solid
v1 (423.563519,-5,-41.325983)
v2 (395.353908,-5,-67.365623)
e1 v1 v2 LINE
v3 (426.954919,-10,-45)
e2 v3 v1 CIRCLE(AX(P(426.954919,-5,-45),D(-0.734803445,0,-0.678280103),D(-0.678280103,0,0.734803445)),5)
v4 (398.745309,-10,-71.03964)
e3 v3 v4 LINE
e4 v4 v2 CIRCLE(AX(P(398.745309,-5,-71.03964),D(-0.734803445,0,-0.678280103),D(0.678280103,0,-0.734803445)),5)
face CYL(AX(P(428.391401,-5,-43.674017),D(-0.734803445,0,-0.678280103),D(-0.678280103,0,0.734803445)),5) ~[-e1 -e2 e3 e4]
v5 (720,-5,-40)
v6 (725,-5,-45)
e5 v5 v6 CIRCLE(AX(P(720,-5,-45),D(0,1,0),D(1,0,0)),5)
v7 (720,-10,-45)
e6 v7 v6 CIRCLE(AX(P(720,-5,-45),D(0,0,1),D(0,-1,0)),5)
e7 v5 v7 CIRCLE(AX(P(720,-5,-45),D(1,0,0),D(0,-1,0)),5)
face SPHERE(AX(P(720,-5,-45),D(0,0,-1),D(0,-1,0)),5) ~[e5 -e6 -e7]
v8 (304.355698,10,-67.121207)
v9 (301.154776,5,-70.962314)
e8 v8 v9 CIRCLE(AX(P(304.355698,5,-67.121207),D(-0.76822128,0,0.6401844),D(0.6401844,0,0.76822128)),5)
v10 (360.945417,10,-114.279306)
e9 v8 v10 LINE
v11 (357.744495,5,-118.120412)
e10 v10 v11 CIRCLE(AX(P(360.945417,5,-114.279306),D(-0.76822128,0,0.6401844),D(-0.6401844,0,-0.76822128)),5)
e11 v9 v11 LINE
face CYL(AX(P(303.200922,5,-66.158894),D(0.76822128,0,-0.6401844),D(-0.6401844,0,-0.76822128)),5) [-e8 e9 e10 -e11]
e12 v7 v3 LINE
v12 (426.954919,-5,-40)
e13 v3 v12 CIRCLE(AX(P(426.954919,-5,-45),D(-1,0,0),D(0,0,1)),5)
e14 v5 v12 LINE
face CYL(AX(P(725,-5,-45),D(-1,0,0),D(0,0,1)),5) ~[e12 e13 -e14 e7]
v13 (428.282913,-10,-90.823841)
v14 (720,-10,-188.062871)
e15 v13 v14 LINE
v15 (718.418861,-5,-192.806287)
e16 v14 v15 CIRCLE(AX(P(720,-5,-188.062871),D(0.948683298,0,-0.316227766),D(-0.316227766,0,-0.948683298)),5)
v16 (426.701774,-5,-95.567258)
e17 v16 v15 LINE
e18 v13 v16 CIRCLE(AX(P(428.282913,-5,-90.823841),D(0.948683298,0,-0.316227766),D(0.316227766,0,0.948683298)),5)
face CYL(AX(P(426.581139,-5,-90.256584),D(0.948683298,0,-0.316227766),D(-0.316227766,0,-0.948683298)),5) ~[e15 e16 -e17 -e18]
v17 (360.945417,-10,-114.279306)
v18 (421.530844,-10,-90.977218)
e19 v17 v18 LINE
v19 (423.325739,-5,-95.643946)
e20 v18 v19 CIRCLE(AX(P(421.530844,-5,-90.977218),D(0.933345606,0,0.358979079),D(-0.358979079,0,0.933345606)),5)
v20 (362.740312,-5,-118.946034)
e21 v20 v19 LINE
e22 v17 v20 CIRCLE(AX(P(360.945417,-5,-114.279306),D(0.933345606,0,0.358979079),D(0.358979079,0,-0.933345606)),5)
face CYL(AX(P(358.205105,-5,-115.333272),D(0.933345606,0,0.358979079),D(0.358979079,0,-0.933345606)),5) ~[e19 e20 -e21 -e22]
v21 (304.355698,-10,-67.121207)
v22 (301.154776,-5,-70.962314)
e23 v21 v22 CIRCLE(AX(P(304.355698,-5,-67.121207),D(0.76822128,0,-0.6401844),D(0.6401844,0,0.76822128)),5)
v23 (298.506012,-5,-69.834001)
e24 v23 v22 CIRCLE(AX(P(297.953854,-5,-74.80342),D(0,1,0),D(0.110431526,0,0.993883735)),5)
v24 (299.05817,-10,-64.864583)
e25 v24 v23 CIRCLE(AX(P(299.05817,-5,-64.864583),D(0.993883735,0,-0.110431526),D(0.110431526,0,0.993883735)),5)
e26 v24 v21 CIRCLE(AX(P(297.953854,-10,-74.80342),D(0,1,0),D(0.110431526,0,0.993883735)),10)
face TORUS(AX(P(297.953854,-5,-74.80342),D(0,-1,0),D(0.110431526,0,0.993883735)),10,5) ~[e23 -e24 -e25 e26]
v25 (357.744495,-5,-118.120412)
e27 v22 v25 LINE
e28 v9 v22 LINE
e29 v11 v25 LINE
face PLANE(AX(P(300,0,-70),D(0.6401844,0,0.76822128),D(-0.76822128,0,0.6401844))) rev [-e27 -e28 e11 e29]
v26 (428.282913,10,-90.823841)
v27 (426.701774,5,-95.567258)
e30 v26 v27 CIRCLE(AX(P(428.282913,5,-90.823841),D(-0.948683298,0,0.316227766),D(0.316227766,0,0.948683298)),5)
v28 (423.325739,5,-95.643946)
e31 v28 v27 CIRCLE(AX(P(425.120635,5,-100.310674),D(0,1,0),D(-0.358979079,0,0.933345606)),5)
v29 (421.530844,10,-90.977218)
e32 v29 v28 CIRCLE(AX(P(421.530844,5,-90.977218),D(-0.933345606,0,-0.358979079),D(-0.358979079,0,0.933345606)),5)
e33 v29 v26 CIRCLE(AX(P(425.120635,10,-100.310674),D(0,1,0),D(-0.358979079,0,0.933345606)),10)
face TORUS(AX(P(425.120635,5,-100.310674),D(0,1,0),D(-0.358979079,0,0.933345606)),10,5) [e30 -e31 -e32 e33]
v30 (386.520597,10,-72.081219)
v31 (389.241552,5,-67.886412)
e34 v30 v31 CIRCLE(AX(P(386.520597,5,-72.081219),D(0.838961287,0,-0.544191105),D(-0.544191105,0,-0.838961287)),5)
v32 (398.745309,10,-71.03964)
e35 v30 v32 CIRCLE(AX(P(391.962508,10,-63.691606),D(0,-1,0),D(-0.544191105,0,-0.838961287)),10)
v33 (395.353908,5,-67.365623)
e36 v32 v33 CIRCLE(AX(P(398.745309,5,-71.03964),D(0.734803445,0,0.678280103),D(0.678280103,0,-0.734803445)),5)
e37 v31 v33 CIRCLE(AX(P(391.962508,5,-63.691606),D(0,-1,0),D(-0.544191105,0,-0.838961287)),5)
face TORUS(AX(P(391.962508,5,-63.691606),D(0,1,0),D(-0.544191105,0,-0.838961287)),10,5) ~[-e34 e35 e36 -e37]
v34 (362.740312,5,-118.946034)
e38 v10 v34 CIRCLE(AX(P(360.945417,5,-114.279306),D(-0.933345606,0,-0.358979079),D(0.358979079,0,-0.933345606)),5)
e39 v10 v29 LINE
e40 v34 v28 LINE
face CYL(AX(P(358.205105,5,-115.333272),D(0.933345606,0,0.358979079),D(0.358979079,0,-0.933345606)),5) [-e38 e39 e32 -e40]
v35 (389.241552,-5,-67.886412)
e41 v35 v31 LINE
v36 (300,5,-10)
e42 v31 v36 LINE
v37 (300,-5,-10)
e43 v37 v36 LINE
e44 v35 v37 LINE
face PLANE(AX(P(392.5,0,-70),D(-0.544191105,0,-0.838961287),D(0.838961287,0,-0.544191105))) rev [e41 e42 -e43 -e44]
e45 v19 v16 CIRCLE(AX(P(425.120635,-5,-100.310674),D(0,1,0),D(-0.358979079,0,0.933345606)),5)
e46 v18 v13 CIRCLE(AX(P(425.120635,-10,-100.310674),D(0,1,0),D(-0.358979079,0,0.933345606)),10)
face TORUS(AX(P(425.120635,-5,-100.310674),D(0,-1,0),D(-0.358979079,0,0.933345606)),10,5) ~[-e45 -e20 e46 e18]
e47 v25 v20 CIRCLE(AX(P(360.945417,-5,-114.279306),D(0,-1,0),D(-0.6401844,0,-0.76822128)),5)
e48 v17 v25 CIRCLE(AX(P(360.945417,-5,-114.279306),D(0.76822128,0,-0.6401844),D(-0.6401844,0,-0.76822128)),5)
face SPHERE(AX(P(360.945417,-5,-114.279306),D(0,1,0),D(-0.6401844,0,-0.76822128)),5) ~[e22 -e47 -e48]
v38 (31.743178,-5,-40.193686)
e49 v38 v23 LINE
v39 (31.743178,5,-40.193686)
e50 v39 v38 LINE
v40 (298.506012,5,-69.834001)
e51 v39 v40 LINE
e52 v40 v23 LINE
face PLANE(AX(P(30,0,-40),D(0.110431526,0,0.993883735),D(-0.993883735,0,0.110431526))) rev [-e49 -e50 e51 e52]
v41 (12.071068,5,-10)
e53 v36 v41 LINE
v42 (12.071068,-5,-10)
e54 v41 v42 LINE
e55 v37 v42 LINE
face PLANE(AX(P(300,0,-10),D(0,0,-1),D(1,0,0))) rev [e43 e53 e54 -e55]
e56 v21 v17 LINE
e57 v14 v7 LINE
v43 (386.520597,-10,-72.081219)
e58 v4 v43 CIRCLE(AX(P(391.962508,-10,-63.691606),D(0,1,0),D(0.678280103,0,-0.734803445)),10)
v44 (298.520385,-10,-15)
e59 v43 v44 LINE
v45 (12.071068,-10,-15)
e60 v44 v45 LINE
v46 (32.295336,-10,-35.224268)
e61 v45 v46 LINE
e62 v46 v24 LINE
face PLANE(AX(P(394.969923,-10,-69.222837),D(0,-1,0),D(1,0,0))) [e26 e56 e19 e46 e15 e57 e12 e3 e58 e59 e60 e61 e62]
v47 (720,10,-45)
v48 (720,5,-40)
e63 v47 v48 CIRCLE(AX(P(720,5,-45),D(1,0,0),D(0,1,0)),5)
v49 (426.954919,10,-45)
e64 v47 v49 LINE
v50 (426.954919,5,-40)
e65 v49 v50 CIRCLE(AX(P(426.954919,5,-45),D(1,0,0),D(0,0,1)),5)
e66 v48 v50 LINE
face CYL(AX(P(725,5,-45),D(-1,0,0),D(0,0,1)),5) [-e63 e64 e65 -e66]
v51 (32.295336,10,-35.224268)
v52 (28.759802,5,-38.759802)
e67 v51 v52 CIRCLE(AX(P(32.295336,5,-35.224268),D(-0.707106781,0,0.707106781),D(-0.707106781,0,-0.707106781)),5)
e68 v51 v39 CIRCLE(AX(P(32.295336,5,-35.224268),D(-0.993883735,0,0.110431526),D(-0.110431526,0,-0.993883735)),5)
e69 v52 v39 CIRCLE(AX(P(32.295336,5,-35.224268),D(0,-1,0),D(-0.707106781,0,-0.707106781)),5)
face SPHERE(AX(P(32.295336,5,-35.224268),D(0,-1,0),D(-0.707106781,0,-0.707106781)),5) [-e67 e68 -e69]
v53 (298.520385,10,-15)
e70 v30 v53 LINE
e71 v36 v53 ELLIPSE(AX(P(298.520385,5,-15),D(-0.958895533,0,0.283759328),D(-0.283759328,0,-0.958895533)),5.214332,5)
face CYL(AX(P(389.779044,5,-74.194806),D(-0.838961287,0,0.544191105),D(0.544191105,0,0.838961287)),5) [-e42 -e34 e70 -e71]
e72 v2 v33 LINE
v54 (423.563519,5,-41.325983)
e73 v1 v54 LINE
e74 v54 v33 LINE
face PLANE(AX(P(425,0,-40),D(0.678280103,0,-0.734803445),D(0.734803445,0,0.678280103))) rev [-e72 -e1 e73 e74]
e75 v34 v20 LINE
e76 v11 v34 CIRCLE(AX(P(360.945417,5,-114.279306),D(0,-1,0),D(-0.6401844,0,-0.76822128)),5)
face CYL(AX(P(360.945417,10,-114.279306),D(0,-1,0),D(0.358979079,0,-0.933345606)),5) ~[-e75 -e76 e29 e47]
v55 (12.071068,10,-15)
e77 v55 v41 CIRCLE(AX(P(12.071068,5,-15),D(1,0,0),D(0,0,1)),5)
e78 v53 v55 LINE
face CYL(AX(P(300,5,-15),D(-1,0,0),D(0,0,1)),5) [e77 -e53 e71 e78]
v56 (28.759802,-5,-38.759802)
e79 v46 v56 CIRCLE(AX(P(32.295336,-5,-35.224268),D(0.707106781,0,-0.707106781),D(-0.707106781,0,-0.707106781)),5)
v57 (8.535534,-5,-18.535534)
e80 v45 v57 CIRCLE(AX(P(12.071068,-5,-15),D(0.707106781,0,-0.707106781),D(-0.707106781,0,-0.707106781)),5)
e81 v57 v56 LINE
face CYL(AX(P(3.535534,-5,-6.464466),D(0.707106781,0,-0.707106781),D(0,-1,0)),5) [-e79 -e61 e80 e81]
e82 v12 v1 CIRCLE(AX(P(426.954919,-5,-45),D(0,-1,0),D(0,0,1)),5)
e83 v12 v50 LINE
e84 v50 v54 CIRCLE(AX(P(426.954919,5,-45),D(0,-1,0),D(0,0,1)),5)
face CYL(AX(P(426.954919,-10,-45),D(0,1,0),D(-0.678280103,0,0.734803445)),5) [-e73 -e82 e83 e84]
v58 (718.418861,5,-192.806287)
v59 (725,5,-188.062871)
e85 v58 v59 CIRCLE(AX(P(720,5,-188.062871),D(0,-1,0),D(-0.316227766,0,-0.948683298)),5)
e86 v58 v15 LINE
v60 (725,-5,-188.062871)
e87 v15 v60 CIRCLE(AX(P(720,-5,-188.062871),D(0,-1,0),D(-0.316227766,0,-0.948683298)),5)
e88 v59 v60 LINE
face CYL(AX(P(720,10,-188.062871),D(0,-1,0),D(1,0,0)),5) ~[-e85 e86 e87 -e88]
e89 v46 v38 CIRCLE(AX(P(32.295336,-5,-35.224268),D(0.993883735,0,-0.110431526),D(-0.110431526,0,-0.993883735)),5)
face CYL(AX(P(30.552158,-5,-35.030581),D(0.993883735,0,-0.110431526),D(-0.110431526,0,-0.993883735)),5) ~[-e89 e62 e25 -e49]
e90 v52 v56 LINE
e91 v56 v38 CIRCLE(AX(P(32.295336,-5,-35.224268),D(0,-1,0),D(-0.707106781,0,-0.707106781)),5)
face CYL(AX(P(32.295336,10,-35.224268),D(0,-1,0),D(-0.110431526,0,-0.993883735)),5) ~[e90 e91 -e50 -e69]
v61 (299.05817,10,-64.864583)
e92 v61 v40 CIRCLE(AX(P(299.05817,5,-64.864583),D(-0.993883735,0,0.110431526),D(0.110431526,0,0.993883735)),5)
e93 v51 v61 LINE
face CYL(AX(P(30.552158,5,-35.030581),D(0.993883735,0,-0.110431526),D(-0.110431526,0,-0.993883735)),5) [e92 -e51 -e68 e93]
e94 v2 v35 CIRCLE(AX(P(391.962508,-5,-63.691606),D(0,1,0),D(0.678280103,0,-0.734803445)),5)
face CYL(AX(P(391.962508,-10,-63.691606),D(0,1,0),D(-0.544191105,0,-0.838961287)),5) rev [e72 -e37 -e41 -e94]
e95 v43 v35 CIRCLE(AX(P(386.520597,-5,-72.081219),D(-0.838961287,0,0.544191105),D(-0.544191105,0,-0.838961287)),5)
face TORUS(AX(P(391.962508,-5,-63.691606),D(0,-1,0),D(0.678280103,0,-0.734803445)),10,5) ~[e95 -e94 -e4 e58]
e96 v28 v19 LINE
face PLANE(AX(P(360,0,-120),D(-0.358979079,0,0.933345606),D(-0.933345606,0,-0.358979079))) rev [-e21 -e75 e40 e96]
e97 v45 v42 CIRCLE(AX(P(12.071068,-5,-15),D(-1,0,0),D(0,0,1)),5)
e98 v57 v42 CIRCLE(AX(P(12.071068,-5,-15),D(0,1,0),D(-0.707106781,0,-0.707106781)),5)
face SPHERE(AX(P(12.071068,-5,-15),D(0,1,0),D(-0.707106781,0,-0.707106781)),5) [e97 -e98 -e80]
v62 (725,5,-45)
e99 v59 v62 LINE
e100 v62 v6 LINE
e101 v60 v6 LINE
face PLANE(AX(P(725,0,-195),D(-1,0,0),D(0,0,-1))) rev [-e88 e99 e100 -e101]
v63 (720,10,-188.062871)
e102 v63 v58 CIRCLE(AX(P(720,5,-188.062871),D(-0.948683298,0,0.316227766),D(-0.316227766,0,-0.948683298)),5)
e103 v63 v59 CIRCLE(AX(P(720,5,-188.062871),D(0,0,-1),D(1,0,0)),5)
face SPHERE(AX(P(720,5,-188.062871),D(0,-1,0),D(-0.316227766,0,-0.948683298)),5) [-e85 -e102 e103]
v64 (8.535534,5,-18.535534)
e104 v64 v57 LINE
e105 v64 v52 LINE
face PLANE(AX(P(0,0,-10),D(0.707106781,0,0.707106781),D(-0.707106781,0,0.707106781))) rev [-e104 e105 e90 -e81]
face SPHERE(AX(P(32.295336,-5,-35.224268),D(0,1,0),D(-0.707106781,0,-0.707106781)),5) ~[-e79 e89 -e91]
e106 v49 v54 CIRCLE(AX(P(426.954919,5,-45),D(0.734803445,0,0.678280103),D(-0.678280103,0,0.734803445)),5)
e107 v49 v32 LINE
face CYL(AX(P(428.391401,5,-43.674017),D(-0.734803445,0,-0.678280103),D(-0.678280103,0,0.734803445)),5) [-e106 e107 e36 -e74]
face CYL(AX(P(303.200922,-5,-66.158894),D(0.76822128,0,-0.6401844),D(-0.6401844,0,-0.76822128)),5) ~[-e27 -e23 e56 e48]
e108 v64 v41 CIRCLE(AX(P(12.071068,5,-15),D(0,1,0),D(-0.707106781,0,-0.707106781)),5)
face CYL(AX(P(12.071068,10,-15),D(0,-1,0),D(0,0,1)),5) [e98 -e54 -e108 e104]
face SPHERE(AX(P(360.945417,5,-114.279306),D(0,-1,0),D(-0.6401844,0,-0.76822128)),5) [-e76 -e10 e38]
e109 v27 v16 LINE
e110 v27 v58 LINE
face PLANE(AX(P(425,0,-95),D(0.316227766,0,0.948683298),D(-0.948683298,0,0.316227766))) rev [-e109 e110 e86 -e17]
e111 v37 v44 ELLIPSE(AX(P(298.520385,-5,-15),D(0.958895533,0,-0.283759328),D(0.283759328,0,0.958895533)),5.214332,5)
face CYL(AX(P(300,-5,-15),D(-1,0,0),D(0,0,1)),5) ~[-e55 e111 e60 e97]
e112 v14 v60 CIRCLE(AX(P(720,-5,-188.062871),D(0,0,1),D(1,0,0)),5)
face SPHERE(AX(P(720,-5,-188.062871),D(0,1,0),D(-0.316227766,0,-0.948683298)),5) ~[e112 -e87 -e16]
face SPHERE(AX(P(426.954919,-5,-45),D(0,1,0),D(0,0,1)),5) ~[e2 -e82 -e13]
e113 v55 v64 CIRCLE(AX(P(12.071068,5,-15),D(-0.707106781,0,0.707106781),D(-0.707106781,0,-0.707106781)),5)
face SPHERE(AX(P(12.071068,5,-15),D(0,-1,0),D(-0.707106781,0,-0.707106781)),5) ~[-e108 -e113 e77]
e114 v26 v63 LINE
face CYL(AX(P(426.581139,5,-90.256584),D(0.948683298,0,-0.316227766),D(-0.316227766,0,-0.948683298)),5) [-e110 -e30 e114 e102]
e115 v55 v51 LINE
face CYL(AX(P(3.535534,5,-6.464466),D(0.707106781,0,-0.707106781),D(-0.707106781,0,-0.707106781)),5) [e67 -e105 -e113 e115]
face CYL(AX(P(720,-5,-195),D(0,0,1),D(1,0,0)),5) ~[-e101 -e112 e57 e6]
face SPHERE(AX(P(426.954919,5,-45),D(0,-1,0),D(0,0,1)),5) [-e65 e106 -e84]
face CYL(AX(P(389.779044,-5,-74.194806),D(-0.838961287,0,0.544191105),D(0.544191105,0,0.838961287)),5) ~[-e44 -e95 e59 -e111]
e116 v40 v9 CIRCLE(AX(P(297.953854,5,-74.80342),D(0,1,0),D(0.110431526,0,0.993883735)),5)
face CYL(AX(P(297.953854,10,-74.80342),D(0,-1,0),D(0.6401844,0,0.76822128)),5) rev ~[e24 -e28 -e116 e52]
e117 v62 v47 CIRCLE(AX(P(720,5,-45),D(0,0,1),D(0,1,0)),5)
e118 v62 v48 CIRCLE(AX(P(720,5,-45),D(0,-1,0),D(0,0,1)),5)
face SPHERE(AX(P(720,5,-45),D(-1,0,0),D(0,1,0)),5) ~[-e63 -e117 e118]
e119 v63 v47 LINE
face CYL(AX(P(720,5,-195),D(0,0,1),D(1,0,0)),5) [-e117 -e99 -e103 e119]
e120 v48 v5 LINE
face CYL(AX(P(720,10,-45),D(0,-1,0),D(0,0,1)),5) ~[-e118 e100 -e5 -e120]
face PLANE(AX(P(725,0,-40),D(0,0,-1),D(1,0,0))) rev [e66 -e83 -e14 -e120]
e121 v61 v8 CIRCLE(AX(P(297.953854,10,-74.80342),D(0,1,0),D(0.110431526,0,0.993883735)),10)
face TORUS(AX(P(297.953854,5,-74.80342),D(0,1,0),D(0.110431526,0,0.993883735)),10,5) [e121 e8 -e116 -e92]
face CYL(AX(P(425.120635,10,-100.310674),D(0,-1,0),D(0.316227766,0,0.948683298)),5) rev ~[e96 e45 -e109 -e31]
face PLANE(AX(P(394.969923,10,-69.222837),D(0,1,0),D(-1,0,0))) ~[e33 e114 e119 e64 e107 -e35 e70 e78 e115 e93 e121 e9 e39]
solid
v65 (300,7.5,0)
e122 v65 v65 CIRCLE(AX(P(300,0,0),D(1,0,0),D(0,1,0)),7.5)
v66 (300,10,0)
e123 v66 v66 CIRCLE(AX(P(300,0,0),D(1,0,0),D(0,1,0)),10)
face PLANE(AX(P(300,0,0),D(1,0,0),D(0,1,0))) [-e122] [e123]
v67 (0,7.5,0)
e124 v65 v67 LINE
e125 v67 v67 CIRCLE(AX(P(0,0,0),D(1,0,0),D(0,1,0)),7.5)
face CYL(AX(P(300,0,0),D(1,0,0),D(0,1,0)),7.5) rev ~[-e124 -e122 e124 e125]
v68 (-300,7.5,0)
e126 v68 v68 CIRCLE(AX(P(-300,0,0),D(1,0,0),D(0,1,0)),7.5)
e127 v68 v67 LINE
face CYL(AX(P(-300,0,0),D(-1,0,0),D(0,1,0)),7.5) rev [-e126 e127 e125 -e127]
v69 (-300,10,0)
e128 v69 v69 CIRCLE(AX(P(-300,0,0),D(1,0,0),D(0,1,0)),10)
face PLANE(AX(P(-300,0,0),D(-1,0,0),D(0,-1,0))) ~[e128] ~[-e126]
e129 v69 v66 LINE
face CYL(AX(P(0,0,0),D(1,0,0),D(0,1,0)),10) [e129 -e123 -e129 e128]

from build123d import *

# Parameters (mm, degrees)
F0_R     = 10
F1_DEPTH = 300
F2_R     = 7.5
F3_DEPTH = 300
F6_DEPTH = 10
F8_R     = 5


with BuildPart() as f1:
    # F0 (on Right) → F1 (new body)
    with BuildSketch(Plane.YZ):
        Circle(F0_R)
    extrude(amount=F1_DEPTH)

    # F2 (on face) → F3 (cut)
    with BuildSketch(Plane.YZ.offset(300)):
        Circle(F2_R)
    extrude(amount=-F3_DEPTH, mode=Mode.SUBTRACT)

    # F4: F1 across plane


with BuildPart() as f1_1:
    add(f1.part)
    add(f1.part.mirror(Plane.YZ))


with BuildPart() as f6:
    # F5 (on Front) → F6 (new body)
    with BuildSketch(Plane.XZ):
        Polygon((300, -10), (0, -10), (30, -40), (300, -70), (360, -120), (425, -95), (725, -195), (725, -95), (725, -40), (425, -40), (392.5, -70), align=None)
    extrude(amount=F6_DEPTH)

    # F7: F6 across face


with BuildPart() as f6_1:
    add(f6.part)
    add(f6.part.mirror(Plane(origin=(460.7482537362, 0, -77.3639538661), x_dir=(1, 0, 0), z_dir=(0, 1, 0))))

    # F8
    f8_edges = [f6_1.edges().sort_by_distance(p)[0] for p in [
        (15, -10, -25),
        (15, 10, -25),
        (165, 10, -55),
        (165, -10, -55),
        (30, 0, -40),
        (330, -10, -95),
        (330, 10, -95),
        (392.5, -10, -107.5),
        (392.5, 10, -107.5),
        (575, 10, -145),
        (575, -10, -145),
        (725, -10, -117.5),
        (575, -10, -40),
        (408.75, -10, -55),
        (346.25, -10, -40),
        (150, -10, -10),
        (150, 10, -10),
        (346.25, 10, -40),
        (575, 10, -40),
        (408.75, 10, -55),
        (392.5, 0, -70),
        (425, 0, -40),
        (725, 10, -117.5),
        (725, 0, -40),
        (725, 0, -195),
        (425, 0, -95),
        (360, 0, -120),
        (300, 0, -70),
        (0, 0, -10),
    ]]
    fillet(f8_edges, radius=F8_R)


solid = Compound([f1_1.part, f6_1.part])
